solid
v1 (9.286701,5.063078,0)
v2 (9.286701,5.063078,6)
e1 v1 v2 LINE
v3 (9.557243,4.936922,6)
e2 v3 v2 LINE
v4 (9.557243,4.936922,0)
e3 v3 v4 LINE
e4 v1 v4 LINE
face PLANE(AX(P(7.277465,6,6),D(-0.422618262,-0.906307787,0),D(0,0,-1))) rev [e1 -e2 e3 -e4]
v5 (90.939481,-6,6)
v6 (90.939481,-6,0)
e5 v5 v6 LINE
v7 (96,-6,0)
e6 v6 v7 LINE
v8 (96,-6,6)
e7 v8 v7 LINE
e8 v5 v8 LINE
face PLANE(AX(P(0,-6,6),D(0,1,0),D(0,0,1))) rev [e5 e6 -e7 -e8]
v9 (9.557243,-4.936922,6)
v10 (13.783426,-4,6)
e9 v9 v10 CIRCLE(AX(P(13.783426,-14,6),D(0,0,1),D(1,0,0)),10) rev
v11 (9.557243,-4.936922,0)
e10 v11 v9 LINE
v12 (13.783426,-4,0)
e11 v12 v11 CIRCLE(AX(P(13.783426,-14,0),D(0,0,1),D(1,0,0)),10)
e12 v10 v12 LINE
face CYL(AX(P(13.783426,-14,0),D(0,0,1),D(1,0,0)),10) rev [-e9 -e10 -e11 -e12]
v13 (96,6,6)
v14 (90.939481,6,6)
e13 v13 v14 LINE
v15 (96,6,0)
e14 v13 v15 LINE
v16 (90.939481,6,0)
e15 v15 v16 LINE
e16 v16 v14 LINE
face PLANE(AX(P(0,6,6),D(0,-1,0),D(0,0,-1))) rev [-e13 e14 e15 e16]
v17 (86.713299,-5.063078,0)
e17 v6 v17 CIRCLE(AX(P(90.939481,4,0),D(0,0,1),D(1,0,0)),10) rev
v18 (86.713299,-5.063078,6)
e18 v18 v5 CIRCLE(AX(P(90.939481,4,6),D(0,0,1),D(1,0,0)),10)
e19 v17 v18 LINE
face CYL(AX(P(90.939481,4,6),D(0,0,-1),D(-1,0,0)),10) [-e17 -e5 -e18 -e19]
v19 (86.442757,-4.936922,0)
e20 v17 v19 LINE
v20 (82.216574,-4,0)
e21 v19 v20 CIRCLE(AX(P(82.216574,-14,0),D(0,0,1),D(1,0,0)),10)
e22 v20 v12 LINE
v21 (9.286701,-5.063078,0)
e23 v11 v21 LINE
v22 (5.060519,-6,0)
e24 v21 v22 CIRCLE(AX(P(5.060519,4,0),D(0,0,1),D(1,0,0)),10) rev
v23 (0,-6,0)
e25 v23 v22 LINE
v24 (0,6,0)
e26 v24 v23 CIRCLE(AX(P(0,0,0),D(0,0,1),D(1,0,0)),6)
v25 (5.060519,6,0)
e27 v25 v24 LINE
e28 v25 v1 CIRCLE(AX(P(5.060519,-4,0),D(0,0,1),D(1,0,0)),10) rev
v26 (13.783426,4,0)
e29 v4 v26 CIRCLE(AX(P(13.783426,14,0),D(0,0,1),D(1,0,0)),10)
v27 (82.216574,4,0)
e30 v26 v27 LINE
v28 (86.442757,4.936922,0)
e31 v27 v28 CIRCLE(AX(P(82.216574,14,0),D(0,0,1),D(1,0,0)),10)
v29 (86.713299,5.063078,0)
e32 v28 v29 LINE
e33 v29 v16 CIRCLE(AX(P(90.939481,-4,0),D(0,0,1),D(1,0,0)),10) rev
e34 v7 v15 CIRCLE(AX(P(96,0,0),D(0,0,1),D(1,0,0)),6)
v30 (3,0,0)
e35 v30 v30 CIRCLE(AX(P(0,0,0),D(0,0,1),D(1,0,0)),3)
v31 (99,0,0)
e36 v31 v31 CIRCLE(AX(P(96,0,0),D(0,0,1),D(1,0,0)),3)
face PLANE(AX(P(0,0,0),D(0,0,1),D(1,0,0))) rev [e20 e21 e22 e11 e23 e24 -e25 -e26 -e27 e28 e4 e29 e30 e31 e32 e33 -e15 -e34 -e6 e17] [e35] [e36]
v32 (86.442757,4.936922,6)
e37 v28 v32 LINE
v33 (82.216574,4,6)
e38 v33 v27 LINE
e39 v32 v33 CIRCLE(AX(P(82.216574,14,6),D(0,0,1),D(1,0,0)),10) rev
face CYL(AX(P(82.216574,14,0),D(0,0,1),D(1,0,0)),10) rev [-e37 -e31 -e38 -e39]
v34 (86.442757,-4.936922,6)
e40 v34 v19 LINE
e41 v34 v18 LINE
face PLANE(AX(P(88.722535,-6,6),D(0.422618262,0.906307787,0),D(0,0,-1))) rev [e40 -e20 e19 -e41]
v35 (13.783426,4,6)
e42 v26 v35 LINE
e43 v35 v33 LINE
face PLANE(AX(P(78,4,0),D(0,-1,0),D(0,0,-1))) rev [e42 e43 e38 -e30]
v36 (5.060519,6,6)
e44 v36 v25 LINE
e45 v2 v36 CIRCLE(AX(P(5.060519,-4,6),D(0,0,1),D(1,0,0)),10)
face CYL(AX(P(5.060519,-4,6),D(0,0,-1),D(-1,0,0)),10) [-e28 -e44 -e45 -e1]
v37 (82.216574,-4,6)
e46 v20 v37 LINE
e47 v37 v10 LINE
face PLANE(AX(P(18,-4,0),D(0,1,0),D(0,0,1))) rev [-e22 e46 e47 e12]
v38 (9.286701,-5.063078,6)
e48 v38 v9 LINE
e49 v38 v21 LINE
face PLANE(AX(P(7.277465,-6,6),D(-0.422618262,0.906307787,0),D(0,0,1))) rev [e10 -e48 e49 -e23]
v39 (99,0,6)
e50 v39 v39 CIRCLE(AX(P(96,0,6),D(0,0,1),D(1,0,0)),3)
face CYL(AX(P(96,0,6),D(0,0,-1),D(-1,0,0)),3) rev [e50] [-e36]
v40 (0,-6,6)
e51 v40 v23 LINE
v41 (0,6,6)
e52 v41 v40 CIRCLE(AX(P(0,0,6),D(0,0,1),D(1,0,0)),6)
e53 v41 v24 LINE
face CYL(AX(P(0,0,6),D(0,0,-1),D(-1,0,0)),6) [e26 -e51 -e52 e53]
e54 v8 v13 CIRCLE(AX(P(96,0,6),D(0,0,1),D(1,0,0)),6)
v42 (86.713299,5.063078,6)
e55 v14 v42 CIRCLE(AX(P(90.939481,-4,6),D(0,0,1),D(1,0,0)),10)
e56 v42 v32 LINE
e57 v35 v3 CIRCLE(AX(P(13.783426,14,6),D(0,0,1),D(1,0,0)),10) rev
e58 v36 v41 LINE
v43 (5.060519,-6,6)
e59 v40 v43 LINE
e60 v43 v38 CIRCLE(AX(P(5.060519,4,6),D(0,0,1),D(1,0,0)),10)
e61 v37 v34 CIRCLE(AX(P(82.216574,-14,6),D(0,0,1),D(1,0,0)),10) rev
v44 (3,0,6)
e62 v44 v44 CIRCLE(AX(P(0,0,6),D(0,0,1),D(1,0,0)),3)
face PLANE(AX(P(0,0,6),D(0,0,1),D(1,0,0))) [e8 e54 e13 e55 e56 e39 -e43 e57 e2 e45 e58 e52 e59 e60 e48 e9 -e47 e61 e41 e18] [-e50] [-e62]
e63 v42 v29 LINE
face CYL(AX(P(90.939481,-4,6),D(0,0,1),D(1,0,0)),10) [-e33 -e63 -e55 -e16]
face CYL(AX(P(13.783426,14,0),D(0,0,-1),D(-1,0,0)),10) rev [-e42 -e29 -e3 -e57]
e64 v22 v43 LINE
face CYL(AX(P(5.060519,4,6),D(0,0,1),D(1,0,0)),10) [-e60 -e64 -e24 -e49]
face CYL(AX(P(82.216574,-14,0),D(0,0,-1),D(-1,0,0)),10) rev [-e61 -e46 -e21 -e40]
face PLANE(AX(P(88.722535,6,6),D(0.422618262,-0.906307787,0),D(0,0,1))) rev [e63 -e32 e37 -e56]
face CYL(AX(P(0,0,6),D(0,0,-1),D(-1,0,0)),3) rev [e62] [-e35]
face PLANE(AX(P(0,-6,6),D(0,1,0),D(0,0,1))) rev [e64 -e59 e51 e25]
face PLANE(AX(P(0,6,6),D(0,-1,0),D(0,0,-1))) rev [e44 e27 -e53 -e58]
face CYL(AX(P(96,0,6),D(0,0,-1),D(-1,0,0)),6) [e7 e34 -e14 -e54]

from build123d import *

# Parameters (mm, degrees)
SKETCH1_R           = 3
BOSS_EXTRUDE2_DEPTH = 6
SKETCH2_W           = 60
SKETCH2_H           = 4
CUT_EXTRUDE2_DEPTH  = 103.352332655
CHAMFER2_SIZE       = 10.722534603
CHAMFER2_SIZE_2     = 5
FILLET2_R           = 10


with BuildPart() as part:
    # Sketch1 → Boss-Extrude2 (new body)
    with BuildSketch(Plane.XY):
        with BuildLine():
            Line((0, 6), (96, 6))
            ThreePointArc((96, 6), (102, 0), (96, -6))
            Line((96, -6), (0, -6))
            ThreePointArc((0, -6), (-6, 0), (0, 6))
        make_face()
        Circle(SKETCH1_R, mode=Mode.SUBTRACT)
        with Locations((96, 0)):
            Circle(SKETCH1_R, mode=Mode.SUBTRACT)
    extrude(amount=BOSS_EXTRUDE2_DEPTH)

    # Sketch2 → Cut-Extrude2 (cut, through all)
    with BuildSketch(Plane.XY.offset(6)):
        with Locations((48, -6)):
            Rectangle(SKETCH2_W, SKETCH2_H)
        with Locations((48, 6)):
            Rectangle(SKETCH2_W, SKETCH2_H)
    extrude(amount=-CUT_EXTRUDE2_DEPTH, mode=Mode.SUBTRACT)

    # Chamfer2
    # the kernel refuses this chamfer: 10.722534603, 5 mm, written as the material it takes off along each edge
    with BuildSketch(Plane(origin=(78, 6, -27.781824147), x_dir=(0.9998669641130703, 0.01631116413111023, 0), z_dir=(0, 0, 1))) as chamfer2_piece_1_section:
        Polygon((CHAMFER2_SIZE * 0.999866964071, -CHAMFER2_SIZE * 0.0163111641304), (-CHAMFER2_SIZE_2 * 0.0163111641311, -CHAMFER2_SIZE_2 * 0.999866964113), (0, 0), align=None)
    chamfer2_piece_1 = extrude(amount=61.563648293, mode=Mode.PRIVATE)
    chamfer2_piece_1 = split(chamfer2_piece_1, bisect_by=Plane(origin=(82.533411446, 4, 3), z_dir=(0, 1, 0)), keep=Keep.TOP, mode=Mode.PRIVATE)
    add(chamfer2_piece_1, mode=Mode.SUBTRACT)
    with BuildSketch(Plane(origin=(78, -6, -27.781824147), x_dir=(-0.07481330637060442, 0.997197557753677, 0), z_dir=(0, 0, 1))) as chamfer2_piece_2_section:
        Polygon((CHAMFER2_SIZE_2 * 0.997197557754, -CHAMFER2_SIZE_2 * 0.0748133063706), (-CHAMFER2_SIZE * 0.0748133063675, -CHAMFER2_SIZE * 0.997197557712), (0, 0), align=None)
    chamfer2_piece_2 = extrude(amount=61.563648293, mode=Mode.PRIVATE)
    chamfer2_piece_2 = split(chamfer2_piece_2, bisect_by=Plane(origin=(82.533411446, -4, 3), z_dir=(0, -1, 0)), keep=Keep.TOP, mode=Mode.PRIVATE)
    add(chamfer2_piece_2, mode=Mode.SUBTRACT)
    with BuildSketch(Plane(origin=(18, -6, 33.781824147), x_dir=(-0.9998669641130703, -0.0163111641311102, 0), z_dir=(0, 0, -1))) as chamfer2_piece_3_section:
        Polygon((CHAMFER2_SIZE * 0.999866964071, CHAMFER2_SIZE * 0.0163111641304), (-CHAMFER2_SIZE_2 * 0.0163111641311, CHAMFER2_SIZE_2 * 0.999866964113), (0, 0), align=None)
    chamfer2_piece_3 = extrude(amount=61.563648293, mode=Mode.PRIVATE)
    chamfer2_piece_3 = split(chamfer2_piece_3, bisect_by=Plane(origin=(13.466588554, -4, 3), z_dir=(0, -1, 0)), keep=Keep.TOP, mode=Mode.PRIVATE)
    add(chamfer2_piece_3, mode=Mode.SUBTRACT)
    with BuildSketch(Plane(origin=(18, 6, 33.781824147), x_dir=(-0.9998669641130703, 0.016311164131110195, 0), z_dir=(0, 0, -1))) as chamfer2_piece_4_section:
        Polygon((CHAMFER2_SIZE * 0.999866964071, -CHAMFER2_SIZE * 0.0163111641304), (-CHAMFER2_SIZE_2 * 0.0163111641311, -CHAMFER2_SIZE_2 * 0.999866964113), (0, 0), align=None)
    chamfer2_piece_4 = extrude(amount=61.563648293, mode=Mode.PRIVATE)
    chamfer2_piece_4 = split(chamfer2_piece_4, bisect_by=Plane(origin=(13.466588554, 4, 3), z_dir=(0, 1, 0)), keep=Keep.TOP, mode=Mode.PRIVATE)
    add(chamfer2_piece_4, mode=Mode.SUBTRACT)

    # Fillet2
    fillet2_edges = [part.edges().sort_by_distance(p)[0] for p in [
        (88.722534603, 6, 3),
        (88.722534603, -6, 3),
        (7.277465397, -6, 3),
        (7.277465397, 6, 3),
        (84.433520762, 4, 3),
        (84.433520762, -4, 3),
        (11.566479238, -4, 3),
        (11.566479238, 4, 3),
    ]]
    fillet(fillet2_edges, radius=FILLET2_R)


solid = part.part
